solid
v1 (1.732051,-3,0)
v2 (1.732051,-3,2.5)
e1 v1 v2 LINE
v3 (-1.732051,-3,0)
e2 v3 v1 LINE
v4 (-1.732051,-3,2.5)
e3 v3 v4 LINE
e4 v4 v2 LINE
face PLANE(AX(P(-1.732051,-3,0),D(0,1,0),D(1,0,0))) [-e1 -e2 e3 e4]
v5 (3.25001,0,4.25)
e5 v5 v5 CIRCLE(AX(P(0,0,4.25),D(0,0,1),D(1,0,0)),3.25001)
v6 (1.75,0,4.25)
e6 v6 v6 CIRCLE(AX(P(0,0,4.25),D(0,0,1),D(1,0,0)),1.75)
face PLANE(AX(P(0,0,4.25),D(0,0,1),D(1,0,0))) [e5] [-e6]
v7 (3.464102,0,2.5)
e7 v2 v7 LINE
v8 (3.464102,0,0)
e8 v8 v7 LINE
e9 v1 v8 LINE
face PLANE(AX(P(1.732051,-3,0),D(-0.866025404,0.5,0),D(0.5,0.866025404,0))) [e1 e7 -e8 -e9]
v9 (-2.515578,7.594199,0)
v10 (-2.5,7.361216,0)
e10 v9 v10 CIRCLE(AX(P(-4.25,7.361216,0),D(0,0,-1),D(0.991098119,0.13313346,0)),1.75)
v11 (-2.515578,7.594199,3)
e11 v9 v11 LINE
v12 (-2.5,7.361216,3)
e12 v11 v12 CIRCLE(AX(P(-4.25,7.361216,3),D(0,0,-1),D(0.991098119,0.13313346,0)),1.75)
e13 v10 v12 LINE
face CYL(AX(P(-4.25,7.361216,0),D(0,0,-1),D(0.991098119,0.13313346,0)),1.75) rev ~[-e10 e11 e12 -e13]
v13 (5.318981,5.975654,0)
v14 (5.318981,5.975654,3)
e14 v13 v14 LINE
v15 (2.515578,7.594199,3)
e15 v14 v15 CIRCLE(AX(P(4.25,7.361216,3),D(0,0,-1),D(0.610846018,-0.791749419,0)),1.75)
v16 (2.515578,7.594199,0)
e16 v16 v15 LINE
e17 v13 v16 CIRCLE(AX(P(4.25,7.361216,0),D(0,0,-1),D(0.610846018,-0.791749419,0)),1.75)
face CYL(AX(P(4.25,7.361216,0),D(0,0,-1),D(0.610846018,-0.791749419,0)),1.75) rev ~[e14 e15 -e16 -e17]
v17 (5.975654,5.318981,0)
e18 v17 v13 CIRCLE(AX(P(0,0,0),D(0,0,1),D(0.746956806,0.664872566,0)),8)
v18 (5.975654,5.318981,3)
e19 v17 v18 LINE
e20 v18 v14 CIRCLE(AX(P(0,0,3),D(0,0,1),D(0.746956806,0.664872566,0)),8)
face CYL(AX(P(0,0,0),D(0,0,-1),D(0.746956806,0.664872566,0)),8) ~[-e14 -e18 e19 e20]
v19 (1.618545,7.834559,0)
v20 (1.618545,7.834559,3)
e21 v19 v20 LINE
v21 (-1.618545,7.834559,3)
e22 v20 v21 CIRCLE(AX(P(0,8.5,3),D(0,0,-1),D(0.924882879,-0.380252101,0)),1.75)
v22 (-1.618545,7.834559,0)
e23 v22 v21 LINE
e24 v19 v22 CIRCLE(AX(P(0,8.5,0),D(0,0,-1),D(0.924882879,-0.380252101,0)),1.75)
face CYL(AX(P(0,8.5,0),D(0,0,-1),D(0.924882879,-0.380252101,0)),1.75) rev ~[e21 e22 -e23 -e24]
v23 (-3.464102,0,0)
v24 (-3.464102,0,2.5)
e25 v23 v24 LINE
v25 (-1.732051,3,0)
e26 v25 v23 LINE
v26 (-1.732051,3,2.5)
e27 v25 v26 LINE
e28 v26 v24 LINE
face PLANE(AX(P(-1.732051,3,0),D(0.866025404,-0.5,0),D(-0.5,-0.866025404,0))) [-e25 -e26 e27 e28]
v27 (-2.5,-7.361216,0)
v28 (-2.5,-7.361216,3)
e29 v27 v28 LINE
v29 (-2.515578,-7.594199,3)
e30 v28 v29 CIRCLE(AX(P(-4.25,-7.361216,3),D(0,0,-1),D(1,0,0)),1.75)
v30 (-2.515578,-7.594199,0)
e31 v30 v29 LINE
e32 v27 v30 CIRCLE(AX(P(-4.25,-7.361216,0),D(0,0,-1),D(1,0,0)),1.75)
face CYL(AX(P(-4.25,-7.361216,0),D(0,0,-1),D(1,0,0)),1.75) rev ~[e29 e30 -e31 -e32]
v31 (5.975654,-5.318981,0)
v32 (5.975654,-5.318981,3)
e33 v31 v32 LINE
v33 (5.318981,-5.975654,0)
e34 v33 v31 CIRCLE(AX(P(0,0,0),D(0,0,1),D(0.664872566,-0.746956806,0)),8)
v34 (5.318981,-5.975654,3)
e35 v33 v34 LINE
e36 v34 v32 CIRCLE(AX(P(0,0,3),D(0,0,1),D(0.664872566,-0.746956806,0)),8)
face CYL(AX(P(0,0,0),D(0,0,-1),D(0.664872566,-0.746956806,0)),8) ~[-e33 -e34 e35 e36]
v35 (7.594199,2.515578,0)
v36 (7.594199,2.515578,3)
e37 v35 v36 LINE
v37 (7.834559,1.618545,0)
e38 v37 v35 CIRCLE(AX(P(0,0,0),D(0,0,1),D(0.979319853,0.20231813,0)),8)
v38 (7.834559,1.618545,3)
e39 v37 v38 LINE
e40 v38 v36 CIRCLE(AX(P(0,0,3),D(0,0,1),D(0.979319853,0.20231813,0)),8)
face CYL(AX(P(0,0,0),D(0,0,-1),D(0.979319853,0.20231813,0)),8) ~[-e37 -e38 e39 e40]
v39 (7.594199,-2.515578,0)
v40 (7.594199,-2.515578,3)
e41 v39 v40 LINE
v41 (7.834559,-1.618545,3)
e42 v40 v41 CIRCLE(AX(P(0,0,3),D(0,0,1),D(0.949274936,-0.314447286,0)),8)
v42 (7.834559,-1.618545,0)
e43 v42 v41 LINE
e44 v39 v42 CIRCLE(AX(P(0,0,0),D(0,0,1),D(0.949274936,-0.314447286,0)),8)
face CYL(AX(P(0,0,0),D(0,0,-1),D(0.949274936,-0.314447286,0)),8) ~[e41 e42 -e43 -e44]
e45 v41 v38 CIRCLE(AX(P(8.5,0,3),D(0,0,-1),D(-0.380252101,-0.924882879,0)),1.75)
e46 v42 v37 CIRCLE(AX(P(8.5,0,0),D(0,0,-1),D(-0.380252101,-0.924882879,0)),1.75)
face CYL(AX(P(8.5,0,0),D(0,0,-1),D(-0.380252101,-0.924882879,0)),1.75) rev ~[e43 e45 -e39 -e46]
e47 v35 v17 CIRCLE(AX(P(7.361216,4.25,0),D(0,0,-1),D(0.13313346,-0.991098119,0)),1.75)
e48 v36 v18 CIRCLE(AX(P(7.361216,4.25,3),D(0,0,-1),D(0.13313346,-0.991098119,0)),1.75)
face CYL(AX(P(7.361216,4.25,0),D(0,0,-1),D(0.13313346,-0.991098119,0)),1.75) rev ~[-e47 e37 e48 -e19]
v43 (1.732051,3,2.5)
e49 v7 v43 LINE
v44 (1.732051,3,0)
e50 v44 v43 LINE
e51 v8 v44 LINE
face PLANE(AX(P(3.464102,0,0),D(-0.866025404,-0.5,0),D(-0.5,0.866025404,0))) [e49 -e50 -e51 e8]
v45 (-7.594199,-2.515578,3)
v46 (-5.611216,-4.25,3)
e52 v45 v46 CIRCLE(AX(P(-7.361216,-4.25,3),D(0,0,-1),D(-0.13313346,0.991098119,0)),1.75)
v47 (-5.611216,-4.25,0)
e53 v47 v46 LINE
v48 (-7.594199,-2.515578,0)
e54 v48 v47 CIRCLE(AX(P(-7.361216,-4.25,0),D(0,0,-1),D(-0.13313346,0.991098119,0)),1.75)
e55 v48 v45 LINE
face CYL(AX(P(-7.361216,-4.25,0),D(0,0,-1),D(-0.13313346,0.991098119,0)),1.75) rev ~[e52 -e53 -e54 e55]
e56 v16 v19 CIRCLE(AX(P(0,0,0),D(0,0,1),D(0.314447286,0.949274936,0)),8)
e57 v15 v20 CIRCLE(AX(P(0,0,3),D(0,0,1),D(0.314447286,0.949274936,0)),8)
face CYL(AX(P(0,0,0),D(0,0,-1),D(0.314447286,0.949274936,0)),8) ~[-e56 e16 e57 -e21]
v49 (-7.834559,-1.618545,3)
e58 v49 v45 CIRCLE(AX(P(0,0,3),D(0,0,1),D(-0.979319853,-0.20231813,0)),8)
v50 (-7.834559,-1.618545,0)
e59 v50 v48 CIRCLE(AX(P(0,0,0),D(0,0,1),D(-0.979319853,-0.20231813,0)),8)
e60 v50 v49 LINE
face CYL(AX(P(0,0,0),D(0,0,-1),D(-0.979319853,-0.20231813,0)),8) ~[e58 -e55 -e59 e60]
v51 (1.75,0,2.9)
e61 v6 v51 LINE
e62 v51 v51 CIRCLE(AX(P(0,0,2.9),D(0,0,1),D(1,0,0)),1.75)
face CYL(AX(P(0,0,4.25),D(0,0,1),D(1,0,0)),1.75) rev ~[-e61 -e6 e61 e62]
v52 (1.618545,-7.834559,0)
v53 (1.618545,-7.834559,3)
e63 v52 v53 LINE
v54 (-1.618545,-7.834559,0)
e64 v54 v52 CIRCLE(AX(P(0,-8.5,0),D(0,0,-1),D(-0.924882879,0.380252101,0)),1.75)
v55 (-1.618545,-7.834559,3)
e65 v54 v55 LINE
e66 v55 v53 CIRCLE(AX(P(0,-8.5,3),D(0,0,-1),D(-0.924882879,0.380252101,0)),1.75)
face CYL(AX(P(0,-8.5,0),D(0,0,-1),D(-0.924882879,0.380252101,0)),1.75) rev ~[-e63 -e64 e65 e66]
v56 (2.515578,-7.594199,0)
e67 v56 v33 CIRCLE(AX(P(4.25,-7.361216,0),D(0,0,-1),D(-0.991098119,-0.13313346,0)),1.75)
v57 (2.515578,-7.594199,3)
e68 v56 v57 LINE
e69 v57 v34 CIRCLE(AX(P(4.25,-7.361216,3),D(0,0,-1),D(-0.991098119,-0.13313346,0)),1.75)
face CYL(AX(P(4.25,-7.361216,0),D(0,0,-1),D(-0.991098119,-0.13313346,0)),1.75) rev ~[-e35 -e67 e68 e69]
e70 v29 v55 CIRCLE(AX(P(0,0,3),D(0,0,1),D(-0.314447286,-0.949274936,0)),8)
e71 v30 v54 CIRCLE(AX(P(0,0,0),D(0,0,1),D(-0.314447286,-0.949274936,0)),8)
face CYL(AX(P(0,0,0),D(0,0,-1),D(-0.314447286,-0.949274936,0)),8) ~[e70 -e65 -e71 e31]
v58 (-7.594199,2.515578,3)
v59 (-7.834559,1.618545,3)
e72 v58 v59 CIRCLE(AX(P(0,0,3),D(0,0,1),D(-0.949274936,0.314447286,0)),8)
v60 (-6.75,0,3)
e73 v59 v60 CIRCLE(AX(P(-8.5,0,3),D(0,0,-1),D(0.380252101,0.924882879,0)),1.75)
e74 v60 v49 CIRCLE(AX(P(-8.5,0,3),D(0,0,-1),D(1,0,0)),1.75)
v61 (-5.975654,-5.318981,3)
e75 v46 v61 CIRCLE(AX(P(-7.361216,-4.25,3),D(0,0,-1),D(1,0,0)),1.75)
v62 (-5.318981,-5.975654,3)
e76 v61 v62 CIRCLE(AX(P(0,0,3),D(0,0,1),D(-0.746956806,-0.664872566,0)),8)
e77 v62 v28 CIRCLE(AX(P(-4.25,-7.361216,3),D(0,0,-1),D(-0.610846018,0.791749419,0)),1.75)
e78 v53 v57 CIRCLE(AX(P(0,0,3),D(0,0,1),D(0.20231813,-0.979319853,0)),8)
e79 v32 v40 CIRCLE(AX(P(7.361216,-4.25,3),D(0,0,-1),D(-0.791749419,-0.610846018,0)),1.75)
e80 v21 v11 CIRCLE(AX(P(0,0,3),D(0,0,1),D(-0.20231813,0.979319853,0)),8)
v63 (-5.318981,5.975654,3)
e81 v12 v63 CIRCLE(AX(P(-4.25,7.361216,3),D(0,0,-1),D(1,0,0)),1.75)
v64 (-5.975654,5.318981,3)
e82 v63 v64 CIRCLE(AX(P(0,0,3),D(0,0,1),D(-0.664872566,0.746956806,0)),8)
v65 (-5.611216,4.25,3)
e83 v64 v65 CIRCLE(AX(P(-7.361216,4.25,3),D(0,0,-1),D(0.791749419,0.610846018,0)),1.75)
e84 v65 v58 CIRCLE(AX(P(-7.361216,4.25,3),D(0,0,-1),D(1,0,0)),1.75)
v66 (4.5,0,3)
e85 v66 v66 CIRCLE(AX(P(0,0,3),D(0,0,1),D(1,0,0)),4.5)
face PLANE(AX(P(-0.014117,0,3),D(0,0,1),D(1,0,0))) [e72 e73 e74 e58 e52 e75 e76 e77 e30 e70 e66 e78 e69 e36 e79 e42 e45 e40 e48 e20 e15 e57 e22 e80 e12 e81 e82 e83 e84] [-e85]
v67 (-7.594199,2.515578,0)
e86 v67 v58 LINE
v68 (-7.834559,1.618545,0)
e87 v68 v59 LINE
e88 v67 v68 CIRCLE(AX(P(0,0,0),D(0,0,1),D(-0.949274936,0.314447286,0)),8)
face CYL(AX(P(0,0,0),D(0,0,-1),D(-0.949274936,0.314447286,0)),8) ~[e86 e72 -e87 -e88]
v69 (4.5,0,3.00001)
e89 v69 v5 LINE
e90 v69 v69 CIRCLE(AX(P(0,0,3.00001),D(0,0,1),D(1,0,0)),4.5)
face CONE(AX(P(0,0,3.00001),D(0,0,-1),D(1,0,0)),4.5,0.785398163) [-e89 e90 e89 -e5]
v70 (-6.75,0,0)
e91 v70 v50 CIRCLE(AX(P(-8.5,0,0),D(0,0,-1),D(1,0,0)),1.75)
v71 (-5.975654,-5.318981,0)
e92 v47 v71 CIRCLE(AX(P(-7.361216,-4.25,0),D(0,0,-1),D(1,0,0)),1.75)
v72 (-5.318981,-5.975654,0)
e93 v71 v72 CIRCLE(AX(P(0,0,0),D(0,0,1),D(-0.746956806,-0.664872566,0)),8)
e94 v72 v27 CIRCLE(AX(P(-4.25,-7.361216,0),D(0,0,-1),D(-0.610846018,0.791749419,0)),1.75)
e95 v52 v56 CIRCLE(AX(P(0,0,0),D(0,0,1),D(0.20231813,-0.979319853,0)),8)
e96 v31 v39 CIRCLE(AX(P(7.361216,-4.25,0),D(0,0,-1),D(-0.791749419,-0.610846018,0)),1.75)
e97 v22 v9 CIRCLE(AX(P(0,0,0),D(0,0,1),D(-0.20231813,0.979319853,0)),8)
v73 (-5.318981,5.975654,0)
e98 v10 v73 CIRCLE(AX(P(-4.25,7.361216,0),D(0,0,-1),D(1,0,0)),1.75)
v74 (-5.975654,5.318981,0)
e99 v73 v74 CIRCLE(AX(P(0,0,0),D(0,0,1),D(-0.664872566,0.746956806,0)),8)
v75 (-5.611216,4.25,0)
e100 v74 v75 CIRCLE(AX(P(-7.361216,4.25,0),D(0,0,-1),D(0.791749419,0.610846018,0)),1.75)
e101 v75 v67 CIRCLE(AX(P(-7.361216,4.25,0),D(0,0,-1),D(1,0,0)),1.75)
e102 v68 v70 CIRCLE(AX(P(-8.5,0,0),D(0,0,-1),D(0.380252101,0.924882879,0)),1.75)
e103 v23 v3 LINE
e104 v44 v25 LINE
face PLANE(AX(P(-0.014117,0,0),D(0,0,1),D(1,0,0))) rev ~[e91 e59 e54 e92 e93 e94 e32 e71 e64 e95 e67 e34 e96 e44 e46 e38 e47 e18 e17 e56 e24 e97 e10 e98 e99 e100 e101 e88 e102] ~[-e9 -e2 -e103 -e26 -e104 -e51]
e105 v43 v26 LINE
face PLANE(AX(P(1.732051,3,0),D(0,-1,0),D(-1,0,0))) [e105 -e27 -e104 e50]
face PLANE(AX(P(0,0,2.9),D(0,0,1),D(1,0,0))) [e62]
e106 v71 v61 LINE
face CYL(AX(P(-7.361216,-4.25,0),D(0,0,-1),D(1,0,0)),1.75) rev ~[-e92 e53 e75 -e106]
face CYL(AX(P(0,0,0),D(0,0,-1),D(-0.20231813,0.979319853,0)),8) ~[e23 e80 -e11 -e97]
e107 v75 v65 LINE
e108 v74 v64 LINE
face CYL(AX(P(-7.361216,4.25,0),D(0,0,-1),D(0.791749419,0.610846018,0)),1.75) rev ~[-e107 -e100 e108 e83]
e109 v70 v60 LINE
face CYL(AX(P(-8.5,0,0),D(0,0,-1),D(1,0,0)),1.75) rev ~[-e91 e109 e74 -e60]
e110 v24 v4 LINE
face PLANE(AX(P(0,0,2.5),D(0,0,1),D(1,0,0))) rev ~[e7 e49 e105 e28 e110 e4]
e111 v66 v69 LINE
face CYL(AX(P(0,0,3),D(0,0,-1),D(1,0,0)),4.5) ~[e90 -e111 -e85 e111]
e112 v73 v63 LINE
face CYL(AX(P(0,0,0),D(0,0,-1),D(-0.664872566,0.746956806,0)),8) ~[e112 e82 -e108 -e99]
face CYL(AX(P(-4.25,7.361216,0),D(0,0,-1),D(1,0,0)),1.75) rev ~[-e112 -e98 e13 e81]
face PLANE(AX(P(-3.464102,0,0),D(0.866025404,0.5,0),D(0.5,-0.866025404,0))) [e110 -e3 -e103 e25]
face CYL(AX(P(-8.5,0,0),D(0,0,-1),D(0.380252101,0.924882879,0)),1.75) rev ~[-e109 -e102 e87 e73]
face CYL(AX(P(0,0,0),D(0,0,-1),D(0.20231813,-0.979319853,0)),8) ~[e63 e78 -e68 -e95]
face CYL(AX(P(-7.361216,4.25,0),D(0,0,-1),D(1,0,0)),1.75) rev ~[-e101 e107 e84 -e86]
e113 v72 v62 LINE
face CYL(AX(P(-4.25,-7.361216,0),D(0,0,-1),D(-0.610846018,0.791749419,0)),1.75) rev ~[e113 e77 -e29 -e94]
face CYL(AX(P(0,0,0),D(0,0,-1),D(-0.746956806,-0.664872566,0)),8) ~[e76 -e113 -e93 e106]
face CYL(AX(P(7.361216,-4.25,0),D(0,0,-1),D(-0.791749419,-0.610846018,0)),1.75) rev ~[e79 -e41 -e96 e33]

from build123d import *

# Parameters (mm, degrees)
F1_DEPTH = 3
F2_DEPTH = 2.5
F3_R     = 4.5
F4_DEPTH = 1.25
F6_SIZE  = 1.24999
F5_R     = 1.75
F7_DEPTH = 1.35


# Not quite as in the source:
# - a fillet or chamfer is up to 0.001 mm smaller than in the source, because OpenCascade refuses the exact size


with BuildPart() as f1:
    # F0 (on Top) → F1 (new body)
    with BuildSketch(Plane.XY):
        with BuildLine():
            ThreePointArc((7.8345588235, -1.6185450382), (6.75, 0), (7.8345588235, 1.6185450382))
            ThreePointArc((7.8345588235, 1.6185450382), (7.7274066103, 2.0705523608), (7.5941994877, 2.5155782915))
            ThreePointArc((7.5941994877, 2.5155782915), (5.8456714755, 3.375), (5.9756544495, 5.318980532))
            ThreePointArc((5.9756544495, 5.318980532), (5.6568542495, 5.6568542495), (5.318980532, 5.9756544495))
            ThreePointArc((5.318980532, 5.9756544495), (3.375, 5.8456714755), (2.5155782915, 7.5941994877))
            ThreePointArc((2.5155782915, 7.5941994877), (2.0705523608, 7.7274066103), (1.6185450382, 7.8345588235))
            ThreePointArc((1.6185450382, 7.8345588235), (0, 6.75), (-1.6185450382, 7.8345588235))
            ThreePointArc((-1.6185450382, 7.8345588235), (-2.0705523608, 7.7274066103), (-2.5155782915, 7.5941994877))
            ThreePointArc((-2.5155782915, 7.5941994877), (-2.5038989162, 7.4779678276), (-2.5, 7.3612159322))
            ThreePointArc((-2.5, 7.3612159322), (-3.4780595655, 5.7906720883), (-5.318980532, 5.9756544495))
            ThreePointArc((-5.318980532, 5.9756544495), (-5.6568542495, 5.6568542495), (-5.9756544495, 5.318980532))
            ThreePointArc((-5.9756544495, 5.318980532), (-5.7048294141, 4.8146978862), (-5.6112159322, 4.25))
            ThreePointArc((-5.6112159322, 4.25), (-6.2090920721, 2.932764026), (-7.5941994877, 2.5155782915))
            ThreePointArc((-7.5941994877, 2.5155782915), (-7.7274066103, 2.0705523608), (-7.8345588235, 1.6185450382))
            ThreePointArc((-7.8345588235, 1.6185450382), (-7.0462080515, 0.9741606493), (-6.75, 0))
            ThreePointArc((-6.75, 0), (-7.0462080515, -0.9741606493), (-7.8345588235, -1.6185450382))
            ThreePointArc((-7.8345588235, -1.6185450382), (-7.7274066103, -2.0705523608), (-7.5941994877, -2.5155782915))
            ThreePointArc((-7.5941994877, -2.5155782915), (-6.2090920721, -2.932764026), (-5.6112159322, -4.25))
            ThreePointArc((-5.6112159322, -4.25), (-5.7048294141, -4.8146978862), (-5.9756544495, -5.318980532))
            ThreePointArc((-5.9756544495, -5.318980532), (-5.6568542495, -5.6568542495), (-5.318980532, -5.9756544495))
            ThreePointArc((-5.318980532, -5.9756544495), (-3.4780595655, -5.7906720883), (-2.5, -7.3612159322))
            ThreePointArc((-2.5, -7.3612159322), (-2.5038989162, -7.4779678276), (-2.5155782915, -7.5941994877))
            ThreePointArc((-2.5155782915, -7.5941994877), (-2.0705523608, -7.7274066103), (-1.6185450382, -7.8345588235))
            ThreePointArc((-1.6185450382, -7.8345588235), (0, -6.75), (1.6185450382, -7.8345588235))
            ThreePointArc((1.6185450382, -7.8345588235), (2.0705523608, -7.7274066103), (2.5155782915, -7.5941994877))
            ThreePointArc((2.5155782915, -7.5941994877), (3.375, -5.8456714755), (5.318980532, -5.9756544495))
            ThreePointArc((5.318980532, -5.9756544495), (5.6568542495, -5.6568542495), (5.9756544495, -5.318980532))
            ThreePointArc((5.9756544495, -5.318980532), (5.8456714755, -3.375), (7.5941994877, -2.5155782915))
            ThreePointArc((7.5941994877, -2.5155782915), (7.7274066103, -2.0705523608), (7.8345588235, -1.6185450382))
        make_face()
        Polygon((3.4641016151, 0), (1.7320508076, -3), (-1.7320508076, -3), (-3.4641016151, 0), (-1.7320508076, 3), (1.7320508076, 3), align=None, mode=Mode.SUBTRACT)
        Polygon((-1.7320508076, -3), (1.7320508076, -3), (3.4641016151, 0), (1.7320508076, 3), (-1.7320508076, 3), (-3.4641016151, 0), align=None)
    extrude(amount=F1_DEPTH)

    # F0 (on Top) → F2 (cut)
    with BuildSketch(Plane.XY):
        Polygon((-1.7320508076, -3), (1.7320508076, -3), (3.4641016151, 0), (1.7320508076, 3), (-1.7320508076, 3), (-3.4641016151, 0), align=None)
    extrude(amount=F2_DEPTH, mode=Mode.SUBTRACT)

    # F3 (on face) → F4 (join)
    with BuildSketch(Plane.XY.offset(3)):
        Circle(F3_R)
    extrude(amount=F4_DEPTH)

    # F6 (size 1.25 in the source; OpenCascade refuses exactly that, so slightly less here)
    f6_edges = [f1.edges().sort_by_distance(p)[0] for p in [
        (-4.5, 0, 4.25),
    ]]
    chamfer(f6_edges, length=F6_SIZE)

    # F5 (on face) → F7 (cut)
    with BuildSketch(Plane.XY.offset(4.25)):
        Circle(F5_R)
    extrude(amount=-F7_DEPTH, mode=Mode.SUBTRACT)


solid = f1.part
